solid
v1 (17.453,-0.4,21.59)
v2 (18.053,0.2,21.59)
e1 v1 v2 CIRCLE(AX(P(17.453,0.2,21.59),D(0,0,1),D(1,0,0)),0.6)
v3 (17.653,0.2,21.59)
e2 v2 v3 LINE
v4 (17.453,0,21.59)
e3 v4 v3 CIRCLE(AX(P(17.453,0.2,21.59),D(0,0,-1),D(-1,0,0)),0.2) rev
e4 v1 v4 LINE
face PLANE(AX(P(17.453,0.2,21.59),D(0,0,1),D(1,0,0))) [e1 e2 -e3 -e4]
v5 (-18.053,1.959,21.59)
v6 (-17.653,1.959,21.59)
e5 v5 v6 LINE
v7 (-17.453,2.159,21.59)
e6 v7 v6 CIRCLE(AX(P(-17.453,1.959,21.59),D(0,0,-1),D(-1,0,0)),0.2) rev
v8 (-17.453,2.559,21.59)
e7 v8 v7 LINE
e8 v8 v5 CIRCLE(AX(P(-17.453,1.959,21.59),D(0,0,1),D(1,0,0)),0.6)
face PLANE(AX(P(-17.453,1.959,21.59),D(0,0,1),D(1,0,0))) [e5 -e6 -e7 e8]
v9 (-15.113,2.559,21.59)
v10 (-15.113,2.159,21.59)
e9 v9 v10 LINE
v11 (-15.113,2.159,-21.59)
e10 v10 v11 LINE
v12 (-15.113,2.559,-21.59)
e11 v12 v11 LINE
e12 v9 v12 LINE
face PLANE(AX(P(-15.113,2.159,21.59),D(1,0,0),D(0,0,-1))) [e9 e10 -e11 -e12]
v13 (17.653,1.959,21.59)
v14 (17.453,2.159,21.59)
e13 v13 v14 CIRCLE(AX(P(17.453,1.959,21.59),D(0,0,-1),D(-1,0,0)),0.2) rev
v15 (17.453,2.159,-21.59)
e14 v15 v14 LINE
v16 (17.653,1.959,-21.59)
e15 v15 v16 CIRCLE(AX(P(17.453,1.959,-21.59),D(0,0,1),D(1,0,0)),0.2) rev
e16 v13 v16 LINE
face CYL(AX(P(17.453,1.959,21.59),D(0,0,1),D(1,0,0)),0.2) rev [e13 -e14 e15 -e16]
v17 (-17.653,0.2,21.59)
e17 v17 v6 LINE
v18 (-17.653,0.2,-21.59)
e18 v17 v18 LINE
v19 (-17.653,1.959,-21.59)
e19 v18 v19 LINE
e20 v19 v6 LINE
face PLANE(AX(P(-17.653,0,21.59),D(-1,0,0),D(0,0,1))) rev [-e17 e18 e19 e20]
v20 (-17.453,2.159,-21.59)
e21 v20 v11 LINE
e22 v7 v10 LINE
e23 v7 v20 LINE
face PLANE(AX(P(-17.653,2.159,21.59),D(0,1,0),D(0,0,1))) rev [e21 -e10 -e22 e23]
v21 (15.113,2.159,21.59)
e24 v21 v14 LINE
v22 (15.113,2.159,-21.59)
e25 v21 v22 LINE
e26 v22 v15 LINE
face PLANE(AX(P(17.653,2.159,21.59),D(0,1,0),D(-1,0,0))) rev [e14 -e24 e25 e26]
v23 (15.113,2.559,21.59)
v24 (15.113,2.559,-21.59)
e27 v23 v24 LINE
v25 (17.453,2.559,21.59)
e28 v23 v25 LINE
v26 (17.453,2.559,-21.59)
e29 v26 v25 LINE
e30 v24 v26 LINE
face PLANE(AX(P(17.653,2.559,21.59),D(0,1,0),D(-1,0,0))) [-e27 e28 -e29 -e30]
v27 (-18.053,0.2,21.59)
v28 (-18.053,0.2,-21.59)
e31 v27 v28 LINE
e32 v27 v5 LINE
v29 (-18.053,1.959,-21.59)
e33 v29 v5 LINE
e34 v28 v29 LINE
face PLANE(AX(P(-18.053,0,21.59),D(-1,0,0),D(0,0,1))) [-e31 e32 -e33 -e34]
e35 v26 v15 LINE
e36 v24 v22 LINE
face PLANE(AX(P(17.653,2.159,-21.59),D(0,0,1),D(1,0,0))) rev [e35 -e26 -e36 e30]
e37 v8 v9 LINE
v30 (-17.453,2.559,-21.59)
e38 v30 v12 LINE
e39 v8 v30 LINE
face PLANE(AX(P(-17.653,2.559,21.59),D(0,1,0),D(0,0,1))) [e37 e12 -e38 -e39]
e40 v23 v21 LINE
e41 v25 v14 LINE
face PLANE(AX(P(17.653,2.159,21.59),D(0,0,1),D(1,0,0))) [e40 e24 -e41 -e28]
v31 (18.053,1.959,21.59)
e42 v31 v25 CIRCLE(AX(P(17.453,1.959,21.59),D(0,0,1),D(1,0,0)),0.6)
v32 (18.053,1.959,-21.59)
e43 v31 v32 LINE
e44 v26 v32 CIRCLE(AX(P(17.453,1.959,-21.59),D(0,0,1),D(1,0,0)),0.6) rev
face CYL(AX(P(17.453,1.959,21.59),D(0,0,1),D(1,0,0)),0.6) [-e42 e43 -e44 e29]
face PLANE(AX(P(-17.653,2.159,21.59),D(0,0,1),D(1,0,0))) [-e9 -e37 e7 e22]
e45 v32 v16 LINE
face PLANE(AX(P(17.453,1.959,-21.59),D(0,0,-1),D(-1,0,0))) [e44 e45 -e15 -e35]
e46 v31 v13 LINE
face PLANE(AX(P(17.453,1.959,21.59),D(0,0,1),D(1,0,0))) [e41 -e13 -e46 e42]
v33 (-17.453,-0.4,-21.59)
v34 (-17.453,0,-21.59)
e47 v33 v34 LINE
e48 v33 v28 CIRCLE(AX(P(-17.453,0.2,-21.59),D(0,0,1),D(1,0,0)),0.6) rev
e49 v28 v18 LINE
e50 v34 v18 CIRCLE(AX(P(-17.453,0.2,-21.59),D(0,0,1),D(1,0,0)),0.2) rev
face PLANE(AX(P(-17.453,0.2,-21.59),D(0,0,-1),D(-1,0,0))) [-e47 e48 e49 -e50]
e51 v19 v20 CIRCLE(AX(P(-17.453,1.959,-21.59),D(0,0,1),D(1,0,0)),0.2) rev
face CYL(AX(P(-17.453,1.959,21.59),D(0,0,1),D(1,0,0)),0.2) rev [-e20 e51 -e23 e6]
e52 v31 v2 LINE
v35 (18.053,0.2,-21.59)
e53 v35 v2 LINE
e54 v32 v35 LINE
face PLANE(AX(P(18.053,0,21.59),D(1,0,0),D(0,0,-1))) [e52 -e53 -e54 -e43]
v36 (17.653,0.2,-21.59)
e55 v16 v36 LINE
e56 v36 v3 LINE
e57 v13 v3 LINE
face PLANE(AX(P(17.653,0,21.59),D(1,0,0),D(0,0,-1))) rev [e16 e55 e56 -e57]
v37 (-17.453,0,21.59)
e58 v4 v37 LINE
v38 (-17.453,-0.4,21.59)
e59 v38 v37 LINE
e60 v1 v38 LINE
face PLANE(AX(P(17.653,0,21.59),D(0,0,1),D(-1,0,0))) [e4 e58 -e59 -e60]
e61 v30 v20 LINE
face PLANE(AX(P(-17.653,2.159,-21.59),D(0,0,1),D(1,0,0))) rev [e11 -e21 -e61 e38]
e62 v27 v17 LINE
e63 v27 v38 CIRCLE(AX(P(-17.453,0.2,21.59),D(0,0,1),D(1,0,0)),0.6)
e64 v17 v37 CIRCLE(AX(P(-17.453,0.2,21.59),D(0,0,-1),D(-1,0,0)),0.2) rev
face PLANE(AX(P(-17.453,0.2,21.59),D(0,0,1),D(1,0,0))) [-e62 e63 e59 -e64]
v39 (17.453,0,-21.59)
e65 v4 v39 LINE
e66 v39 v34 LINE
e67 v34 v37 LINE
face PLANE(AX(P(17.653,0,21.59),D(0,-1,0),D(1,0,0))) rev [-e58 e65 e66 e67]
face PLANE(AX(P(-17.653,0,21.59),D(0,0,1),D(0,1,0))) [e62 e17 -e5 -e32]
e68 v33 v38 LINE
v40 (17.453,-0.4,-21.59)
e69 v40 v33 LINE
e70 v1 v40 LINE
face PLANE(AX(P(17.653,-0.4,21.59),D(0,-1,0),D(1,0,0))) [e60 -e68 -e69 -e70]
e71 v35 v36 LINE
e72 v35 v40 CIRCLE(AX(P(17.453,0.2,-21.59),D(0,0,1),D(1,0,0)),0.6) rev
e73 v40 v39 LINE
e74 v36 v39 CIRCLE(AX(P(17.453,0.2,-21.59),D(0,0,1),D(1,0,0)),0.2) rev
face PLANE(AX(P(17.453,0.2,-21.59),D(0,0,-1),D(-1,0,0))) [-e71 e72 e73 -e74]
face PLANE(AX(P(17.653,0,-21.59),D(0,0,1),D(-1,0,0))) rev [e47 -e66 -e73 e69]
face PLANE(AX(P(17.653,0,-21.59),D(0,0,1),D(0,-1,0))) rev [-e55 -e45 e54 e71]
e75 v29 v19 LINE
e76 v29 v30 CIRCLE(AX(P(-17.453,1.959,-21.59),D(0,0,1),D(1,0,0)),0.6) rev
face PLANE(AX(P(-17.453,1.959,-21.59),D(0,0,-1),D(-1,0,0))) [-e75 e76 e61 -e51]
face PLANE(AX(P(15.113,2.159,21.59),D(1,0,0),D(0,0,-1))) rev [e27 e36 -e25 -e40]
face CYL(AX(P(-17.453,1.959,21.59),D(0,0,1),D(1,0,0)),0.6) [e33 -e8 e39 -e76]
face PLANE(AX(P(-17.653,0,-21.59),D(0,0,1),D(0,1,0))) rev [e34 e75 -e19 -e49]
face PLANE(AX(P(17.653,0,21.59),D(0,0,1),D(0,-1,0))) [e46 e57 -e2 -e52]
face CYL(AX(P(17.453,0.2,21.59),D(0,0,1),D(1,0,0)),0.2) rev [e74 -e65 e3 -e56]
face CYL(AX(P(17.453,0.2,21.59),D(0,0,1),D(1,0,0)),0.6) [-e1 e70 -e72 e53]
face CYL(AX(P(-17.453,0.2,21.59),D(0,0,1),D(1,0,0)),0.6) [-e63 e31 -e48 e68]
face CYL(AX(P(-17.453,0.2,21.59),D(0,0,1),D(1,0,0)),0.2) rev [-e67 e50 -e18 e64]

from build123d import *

# Parameters (mm, degrees)
EXTRUDE_THIN3_DEPTH    = 21.59
CONVERT_SOLID1_START   = -21.59
CONVERT_SOLID1_DEPTH   = 43.18
CONVERT_SOLID1_2_DEPTH = 43.18


# Read off the part's stored shape, not the designer's step: Convert-Solid1
with BuildPart() as part:
    # Sketch6 → Extrude-Thin3 (new, symmetric)
    with BuildSketch(Plane.XY):
        Polygon((15.113, 2.159), (17.653, 2.159), (17.653, 0), (-17.653, 0), (-17.653, 2.159), (-15.113, 2.159), (-15.113, 2.559), (-18.053, 2.559), (-18.053, -0.4), (18.053, -0.4), (18.053, 2.559), (15.113, 2.559), align=None)
    extrude(amount=EXTRUDE_THIN3_DEPTH, both=True)

    # Convert-Solid1 outline → Convert-Solid1 (cut)
    with BuildSketch(Plane.XY.offset(CONVERT_SOLID1_START)):
        with BuildLine():
            Line((-18.053, 2.559), (-18.053, 1.959))
            ThreePointArc((-18.053, 1.959), (-17.877264, 2.383264), (-17.453, 2.559))
            Line((-17.453, 2.559), (-18.053, 2.559))
        make_face()
        with BuildLine():
            Line((-18.053, -0.4), (-17.453, -0.4))
            ThreePointArc((-17.453, -0.4), (-17.877264, -0.224264), (-18.053, 0.2))
            Line((-18.053, 0.2), (-18.053, -0.4))
        make_face()
        with BuildLine():
            Line((18.053, -0.4), (18.053, 0.2))
            ThreePointArc((18.053, 0.2), (17.877264, -0.224264), (17.453, -0.4))
            Line((17.453, -0.4), (18.053, -0.4))
        make_face()
        with BuildLine():
            ThreePointArc((17.453, 2.559), (17.877264, 2.383264), (18.053, 1.959))
            Line((18.053, 1.959), (18.053, 2.559))
            Line((18.053, 2.559), (17.453, 2.559))
        make_face()
    extrude(amount=CONVERT_SOLID1_DEPTH, mode=Mode.SUBTRACT)

    # Convert-Solid1 2 outline → Convert-Solid1 2 (add)
    with BuildSketch(Plane.XY.offset(CONVERT_SOLID1_START)):
        with BuildLine():
            Line((-17.653, 2.159), (-17.653, 1.959))
            ThreePointArc((-17.653, 1.959), (-17.594421, 2.100421), (-17.453, 2.159))
            Line((-17.453, 2.159), (-17.653, 2.159))
        make_face()
        with BuildLine():
            Line((-17.653, 0), (-17.453, 0))
            ThreePointArc((-17.453, 0), (-17.594421, 0.058579), (-17.653, 0.2))
            Line((-17.653, 0.2), (-17.653, 0))
        make_face()
        with BuildLine():
            Line((17.653, 0), (17.653, 0.2))
            ThreePointArc((17.653, 0.2), (17.594421, 0.058579), (17.453, 0))
            Line((17.453, 0), (17.653, 0))
        make_face()
        with BuildLine():
            ThreePointArc((17.453, 2.159), (17.594421, 2.100421), (17.653, 1.959))
            Line((17.653, 1.959), (17.653, 2.159))
            Line((17.653, 2.159), (17.453, 2.159))
        make_face()
    extrude(amount=CONVERT_SOLID1_2_DEPTH)


solid = part.part
